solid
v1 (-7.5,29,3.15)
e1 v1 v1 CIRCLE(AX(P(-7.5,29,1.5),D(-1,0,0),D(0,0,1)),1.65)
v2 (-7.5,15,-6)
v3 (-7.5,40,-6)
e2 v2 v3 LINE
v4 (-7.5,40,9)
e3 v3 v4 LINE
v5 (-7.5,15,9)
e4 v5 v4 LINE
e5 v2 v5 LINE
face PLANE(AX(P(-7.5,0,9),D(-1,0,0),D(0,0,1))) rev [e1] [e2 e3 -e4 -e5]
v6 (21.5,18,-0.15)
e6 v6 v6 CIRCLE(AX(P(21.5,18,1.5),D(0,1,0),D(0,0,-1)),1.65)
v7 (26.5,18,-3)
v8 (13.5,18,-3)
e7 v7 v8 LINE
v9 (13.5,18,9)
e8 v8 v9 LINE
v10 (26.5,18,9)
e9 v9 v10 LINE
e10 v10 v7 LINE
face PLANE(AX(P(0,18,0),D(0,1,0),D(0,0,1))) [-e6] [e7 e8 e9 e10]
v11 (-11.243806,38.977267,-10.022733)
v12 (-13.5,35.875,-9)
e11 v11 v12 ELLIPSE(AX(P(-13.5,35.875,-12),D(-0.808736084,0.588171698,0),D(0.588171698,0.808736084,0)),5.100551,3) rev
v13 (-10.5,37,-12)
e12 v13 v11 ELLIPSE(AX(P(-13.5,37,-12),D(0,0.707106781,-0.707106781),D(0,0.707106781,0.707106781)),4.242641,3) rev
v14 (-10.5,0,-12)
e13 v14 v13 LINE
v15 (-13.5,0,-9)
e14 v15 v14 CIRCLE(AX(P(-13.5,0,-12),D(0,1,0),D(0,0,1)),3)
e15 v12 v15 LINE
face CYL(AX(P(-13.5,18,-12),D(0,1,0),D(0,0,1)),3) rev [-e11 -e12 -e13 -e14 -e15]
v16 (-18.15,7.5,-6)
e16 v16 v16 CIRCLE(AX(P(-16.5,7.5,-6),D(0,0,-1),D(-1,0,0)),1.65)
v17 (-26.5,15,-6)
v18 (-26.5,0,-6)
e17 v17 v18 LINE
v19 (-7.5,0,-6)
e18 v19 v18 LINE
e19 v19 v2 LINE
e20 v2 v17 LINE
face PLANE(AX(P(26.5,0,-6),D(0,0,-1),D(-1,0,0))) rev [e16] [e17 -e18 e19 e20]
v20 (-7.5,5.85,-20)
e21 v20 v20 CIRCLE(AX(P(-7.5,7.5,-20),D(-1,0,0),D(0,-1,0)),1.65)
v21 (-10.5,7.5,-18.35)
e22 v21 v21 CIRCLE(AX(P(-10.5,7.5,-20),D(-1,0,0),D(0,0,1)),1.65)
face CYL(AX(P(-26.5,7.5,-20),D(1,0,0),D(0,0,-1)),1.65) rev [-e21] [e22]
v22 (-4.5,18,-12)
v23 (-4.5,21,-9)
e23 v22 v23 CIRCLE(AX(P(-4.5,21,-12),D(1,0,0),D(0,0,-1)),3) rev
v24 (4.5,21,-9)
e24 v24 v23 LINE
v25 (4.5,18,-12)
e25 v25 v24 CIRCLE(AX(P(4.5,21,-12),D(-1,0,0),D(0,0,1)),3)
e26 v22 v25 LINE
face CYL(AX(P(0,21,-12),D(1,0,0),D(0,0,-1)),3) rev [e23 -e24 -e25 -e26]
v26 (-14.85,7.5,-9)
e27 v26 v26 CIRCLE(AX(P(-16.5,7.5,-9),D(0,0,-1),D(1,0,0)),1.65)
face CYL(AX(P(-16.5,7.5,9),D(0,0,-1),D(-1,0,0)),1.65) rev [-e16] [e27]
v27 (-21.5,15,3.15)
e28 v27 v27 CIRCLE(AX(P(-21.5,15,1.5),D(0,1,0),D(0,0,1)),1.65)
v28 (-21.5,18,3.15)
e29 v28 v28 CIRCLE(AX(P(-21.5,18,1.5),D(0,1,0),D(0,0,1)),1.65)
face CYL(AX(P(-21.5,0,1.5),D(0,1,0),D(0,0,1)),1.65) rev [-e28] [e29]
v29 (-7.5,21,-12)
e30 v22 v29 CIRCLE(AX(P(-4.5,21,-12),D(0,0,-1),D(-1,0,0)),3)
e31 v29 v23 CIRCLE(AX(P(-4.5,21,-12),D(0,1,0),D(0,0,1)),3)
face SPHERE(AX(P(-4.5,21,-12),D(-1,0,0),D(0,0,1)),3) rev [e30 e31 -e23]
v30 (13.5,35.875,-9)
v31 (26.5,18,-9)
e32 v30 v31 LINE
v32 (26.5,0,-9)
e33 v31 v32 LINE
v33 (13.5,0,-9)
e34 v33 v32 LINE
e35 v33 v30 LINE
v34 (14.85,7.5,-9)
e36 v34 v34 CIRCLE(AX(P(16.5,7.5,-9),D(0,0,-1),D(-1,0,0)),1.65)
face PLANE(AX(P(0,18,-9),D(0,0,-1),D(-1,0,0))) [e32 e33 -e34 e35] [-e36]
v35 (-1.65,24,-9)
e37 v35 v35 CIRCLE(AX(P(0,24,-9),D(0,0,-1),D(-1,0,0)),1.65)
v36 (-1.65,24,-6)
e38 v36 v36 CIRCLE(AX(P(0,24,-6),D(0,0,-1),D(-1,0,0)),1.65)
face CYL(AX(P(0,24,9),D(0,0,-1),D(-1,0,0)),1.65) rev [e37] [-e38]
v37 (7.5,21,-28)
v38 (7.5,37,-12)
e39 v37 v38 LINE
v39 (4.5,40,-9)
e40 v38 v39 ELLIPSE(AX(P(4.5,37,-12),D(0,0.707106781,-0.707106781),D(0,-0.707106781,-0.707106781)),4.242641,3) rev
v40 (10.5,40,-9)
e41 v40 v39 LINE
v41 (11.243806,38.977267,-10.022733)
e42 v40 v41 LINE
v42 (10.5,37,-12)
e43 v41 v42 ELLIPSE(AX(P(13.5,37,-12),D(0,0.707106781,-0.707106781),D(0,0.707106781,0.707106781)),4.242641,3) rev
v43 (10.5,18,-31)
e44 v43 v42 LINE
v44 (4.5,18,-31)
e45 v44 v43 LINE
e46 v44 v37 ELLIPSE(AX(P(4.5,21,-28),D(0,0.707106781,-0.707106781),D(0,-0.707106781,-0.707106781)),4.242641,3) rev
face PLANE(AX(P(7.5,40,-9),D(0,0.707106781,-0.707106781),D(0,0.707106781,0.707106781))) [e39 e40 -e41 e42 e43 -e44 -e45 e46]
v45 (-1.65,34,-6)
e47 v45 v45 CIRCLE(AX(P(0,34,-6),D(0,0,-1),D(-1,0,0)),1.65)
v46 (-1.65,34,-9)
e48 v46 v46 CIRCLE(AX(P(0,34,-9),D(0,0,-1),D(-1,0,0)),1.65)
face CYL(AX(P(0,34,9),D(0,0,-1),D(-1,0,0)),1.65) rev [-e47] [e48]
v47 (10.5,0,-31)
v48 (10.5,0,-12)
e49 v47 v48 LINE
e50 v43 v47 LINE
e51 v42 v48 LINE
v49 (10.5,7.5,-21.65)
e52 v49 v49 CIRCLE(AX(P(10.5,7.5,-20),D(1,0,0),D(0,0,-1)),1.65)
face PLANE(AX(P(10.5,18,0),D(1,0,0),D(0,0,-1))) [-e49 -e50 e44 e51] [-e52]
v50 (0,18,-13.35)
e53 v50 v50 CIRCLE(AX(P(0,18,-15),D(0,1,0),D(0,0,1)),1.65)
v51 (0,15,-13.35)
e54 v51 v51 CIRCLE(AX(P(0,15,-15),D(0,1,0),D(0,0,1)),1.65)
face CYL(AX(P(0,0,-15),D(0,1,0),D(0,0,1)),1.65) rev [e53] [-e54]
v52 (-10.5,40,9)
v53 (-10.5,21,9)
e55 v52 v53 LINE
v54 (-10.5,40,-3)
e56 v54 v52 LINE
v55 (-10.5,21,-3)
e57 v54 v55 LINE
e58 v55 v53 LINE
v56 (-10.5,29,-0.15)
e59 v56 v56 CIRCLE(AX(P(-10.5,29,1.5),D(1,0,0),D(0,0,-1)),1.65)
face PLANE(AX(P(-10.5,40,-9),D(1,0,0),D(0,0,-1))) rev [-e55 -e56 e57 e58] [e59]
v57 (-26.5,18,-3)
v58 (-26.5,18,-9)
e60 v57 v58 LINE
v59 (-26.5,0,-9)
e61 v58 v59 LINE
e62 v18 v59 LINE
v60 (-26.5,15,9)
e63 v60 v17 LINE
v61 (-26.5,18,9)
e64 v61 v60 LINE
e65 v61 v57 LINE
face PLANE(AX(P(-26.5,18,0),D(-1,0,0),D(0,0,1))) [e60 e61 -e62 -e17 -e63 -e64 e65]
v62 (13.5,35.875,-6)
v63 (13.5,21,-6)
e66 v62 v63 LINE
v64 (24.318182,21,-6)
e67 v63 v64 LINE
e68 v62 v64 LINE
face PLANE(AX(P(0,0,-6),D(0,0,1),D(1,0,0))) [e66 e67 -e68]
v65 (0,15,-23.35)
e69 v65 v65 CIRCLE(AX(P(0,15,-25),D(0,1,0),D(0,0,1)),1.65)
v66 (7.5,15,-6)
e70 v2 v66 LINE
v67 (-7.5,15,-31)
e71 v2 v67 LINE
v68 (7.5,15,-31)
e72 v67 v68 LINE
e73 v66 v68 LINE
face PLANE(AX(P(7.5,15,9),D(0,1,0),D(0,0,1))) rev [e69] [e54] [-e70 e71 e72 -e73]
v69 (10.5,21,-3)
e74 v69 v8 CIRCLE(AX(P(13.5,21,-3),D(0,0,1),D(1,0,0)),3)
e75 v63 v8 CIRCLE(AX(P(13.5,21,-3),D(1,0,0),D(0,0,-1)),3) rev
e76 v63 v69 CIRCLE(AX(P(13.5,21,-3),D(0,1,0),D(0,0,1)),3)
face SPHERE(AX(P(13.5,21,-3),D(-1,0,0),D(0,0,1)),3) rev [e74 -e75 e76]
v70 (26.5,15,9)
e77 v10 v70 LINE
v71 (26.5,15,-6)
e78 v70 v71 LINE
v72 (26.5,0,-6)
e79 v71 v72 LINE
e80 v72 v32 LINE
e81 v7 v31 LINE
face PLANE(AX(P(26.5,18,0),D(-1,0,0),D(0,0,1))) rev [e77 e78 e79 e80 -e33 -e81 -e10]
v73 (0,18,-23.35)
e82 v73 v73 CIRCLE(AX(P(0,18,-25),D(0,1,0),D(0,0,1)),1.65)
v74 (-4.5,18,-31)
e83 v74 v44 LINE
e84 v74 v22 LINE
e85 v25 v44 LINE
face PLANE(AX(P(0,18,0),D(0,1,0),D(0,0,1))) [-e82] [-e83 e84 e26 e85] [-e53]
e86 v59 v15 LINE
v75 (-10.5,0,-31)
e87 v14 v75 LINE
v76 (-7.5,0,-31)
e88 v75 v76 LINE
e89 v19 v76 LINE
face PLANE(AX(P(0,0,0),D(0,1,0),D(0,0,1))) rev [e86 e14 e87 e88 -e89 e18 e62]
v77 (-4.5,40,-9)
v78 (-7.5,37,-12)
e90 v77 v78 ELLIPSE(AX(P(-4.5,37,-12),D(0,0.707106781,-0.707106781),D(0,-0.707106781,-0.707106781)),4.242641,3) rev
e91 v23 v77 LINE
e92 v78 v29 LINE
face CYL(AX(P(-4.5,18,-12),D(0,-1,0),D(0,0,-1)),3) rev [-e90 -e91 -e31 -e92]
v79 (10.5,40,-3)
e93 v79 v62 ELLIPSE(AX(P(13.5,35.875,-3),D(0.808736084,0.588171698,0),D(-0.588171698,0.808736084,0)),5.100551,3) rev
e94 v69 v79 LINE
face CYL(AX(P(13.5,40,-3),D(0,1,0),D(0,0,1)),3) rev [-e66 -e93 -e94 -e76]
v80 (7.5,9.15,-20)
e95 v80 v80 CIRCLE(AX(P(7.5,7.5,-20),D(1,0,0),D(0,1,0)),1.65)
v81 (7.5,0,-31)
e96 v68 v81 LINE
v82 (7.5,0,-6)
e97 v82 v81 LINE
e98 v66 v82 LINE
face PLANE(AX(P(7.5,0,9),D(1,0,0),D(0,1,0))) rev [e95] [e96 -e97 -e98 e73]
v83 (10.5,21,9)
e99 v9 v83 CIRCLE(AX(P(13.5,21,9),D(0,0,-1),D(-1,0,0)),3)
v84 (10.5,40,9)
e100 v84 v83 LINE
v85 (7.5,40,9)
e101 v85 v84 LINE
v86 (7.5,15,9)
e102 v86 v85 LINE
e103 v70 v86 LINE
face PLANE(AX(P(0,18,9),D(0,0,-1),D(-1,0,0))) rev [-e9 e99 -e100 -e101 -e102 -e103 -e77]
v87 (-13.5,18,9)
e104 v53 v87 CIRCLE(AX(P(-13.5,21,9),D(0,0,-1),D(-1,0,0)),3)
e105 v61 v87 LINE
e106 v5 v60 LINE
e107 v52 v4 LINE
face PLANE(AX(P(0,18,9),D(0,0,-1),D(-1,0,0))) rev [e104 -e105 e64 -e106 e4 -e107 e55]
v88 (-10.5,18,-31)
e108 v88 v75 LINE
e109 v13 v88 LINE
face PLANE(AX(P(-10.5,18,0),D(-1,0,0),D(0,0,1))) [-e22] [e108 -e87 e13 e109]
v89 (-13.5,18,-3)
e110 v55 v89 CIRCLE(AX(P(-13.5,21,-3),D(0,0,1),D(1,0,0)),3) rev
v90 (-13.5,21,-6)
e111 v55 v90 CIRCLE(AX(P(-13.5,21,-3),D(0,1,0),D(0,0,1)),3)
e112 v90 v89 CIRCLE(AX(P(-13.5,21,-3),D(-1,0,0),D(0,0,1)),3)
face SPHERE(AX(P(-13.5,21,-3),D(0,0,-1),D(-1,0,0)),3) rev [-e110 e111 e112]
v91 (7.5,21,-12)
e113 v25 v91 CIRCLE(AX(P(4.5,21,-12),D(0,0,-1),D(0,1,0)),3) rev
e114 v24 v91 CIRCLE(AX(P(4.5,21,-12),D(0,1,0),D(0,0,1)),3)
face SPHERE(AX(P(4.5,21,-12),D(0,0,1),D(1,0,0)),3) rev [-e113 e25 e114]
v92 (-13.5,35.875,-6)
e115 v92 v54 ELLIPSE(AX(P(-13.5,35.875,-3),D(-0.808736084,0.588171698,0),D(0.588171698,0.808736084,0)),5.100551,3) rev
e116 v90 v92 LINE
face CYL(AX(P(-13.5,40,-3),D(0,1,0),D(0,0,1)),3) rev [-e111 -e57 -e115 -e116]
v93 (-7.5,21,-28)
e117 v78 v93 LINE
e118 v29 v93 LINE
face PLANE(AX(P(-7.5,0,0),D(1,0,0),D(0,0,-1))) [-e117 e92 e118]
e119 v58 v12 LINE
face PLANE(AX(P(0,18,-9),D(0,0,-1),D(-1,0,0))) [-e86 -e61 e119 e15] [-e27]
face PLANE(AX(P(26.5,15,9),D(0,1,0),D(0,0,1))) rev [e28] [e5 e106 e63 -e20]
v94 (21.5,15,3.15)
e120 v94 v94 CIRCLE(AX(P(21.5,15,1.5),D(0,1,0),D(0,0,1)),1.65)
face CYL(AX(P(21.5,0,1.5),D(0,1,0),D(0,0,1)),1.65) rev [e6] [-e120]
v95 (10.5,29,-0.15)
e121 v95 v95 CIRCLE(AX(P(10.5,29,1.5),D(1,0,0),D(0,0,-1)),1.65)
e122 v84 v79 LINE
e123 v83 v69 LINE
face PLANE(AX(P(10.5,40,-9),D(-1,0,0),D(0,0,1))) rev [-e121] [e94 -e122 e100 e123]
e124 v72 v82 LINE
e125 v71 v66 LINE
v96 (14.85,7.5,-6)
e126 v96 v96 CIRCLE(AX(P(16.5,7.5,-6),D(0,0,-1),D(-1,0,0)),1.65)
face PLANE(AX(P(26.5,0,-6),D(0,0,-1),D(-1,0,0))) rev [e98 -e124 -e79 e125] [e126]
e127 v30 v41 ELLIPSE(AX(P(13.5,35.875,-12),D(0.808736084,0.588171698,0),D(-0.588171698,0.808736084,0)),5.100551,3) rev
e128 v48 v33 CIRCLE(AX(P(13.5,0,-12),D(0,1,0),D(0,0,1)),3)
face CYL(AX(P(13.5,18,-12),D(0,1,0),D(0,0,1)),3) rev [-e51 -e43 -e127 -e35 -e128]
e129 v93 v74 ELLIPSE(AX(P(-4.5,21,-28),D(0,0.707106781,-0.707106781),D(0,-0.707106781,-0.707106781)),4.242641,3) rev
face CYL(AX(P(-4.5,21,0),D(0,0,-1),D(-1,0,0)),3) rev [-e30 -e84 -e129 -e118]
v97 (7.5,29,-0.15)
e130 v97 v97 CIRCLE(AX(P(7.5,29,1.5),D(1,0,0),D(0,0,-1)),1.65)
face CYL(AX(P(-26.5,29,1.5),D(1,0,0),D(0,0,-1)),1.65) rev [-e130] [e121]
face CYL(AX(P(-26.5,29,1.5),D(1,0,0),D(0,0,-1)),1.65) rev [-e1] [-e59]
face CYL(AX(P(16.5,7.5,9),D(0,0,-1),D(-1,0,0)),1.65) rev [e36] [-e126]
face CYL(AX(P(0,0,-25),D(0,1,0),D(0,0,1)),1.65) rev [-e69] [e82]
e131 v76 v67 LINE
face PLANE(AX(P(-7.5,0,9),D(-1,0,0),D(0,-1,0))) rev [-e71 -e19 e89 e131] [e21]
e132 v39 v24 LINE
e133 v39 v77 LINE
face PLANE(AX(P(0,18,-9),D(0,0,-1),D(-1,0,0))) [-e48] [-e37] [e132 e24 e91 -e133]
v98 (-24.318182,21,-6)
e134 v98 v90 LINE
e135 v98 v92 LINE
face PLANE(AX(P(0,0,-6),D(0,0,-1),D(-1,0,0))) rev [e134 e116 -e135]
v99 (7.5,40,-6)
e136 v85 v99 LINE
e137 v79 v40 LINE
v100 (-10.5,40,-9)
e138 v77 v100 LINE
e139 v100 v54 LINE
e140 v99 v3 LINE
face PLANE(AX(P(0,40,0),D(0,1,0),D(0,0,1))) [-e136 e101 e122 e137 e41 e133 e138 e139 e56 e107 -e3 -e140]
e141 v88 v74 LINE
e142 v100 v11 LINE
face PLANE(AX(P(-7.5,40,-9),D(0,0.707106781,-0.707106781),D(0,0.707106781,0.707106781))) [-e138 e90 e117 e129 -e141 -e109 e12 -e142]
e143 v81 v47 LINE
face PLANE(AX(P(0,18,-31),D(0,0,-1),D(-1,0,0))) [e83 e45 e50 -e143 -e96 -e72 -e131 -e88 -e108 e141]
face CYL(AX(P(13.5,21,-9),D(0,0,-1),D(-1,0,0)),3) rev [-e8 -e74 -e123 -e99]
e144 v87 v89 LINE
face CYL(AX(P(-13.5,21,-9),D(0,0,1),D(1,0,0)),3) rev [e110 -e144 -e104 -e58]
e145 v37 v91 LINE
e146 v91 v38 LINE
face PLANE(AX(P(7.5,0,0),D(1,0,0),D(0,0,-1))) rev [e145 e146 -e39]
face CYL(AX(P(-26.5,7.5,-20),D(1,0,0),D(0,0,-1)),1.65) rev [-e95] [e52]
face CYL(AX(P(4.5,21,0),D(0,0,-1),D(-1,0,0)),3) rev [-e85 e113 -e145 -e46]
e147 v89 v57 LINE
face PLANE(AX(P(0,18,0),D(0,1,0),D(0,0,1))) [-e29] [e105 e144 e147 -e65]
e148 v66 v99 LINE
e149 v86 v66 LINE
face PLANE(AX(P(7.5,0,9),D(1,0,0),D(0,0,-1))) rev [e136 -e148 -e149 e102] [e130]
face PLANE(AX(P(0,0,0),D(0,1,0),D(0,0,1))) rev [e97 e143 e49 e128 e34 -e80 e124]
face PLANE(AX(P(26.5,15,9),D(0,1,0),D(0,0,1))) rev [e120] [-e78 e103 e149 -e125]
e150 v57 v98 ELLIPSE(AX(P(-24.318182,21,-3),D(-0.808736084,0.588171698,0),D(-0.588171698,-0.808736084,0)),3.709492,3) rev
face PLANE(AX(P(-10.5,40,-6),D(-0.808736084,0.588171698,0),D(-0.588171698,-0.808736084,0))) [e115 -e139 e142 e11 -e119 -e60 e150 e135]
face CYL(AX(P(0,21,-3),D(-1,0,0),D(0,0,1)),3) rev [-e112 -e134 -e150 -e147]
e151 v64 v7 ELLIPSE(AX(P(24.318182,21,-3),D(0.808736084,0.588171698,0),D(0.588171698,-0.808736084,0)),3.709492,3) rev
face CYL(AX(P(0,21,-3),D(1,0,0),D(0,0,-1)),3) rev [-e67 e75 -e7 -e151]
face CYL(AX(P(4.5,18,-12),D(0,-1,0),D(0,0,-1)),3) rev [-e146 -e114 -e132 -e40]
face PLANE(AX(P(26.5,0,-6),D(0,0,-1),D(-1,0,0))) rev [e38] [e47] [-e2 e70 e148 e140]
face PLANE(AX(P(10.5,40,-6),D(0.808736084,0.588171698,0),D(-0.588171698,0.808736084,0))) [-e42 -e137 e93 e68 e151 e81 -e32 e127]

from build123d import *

# Parameters (mm, degrees)
EXTRUDE_1_DEPTH     = 18
SKETCH_2_W          = 21
SKETCH_2_H          = 18
EXTRUDE_2_DEPTH     = 22
SKETCH_3_W          = 15
SKETCH_3_H          = 15
CUT_EXTRUDE_1_DEPTH = 74.280283842
SKETCH_4_W          = 15
SKETCH_4_H          = 15
CUT_EXTRUDE_2_DEPTH = 58.124863238
SKETCH_5_W          = 15
SKETCH_5_H          = 15
CUT_EXTRUDE_3_DEPTH = 63.467991804
SKETCH_6_R          = 1.65
CUT_EXTRUDE_4_DEPTH = 53.784941034
SKETCH_7_R          = 1.65
CUT_EXTRUDE_5_DEPTH = 47.338428976
SKETCH_8_R          = 1.65
CUT_EXTRUDE_6_DEPTH = 63.689712075
EXTRUDE_4_DEPTH     = 3
EXTRUDE_5_DEPTH     = 3
EXTRUDE_6_DEPTH     = 3
FILLET_1_R          = 3


with BuildPart() as part:
    # 草图1 → 凸台-拉伸1 (new body)
    with BuildSketch(Plane(origin=(0, 0, 0), x_dir=(1, 0, 0), z_dir=(0, 1, 0))):
        Polygon((10.5, 9), (26.5, 9), (26.5, -9), (-26.5, -9), (-26.5, 9), (-10.5, 9), (-10.5, 31), (10.5, 31), align=None)
    extrude(amount=EXTRUDE_1_DEPTH)

    # 草图2 → 凸台-拉伸2 (add)
    with BuildSketch(Plane(origin=(0, 18, 0), x_dir=(1, 0, 0), z_dir=(0, 1, 0))):
        Rectangle(SKETCH_2_W, SKETCH_2_H)
    extrude(amount=EXTRUDE_2_DEPTH)

    # 草图3 → 切除-拉伸1 (cut, through all)
    with BuildSketch(Plane.ZY.offset(26.5)):
        with Locations((1.5, 7.5)):
            Rectangle(SKETCH_3_W, SKETCH_3_H)
    extrude(amount=-CUT_EXTRUDE_1_DEPTH, mode=Mode.SUBTRACT)

    # 草图4 → 切除-拉伸2 (cut, through all)
    with BuildSketch(Plane(origin=(0, 40, 0), x_dir=(1, 0, 0), z_dir=(0, 1, 0))):
        with Locations((0, -1.5)):
            Rectangle(SKETCH_4_W, SKETCH_4_H)
    extrude(amount=-CUT_EXTRUDE_2_DEPTH, mode=Mode.SUBTRACT)

    # 草图5 → 切除-拉伸3 (cut, through all)
    with BuildSketch(Plane(origin=(0, 0, -31), x_dir=(-1, 0, 0), z_dir=(0, 0, -1))):
        with Locations((0, 7.5)):
            Rectangle(SKETCH_5_W, SKETCH_5_H)
    extrude(amount=-CUT_EXTRUDE_3_DEPTH, mode=Mode.SUBTRACT)

    # 草图6 → 切除-拉伸4 (cut, through all)
    with BuildSketch(Plane(origin=(0, 0, -9), x_dir=(-1, 0, 0), z_dir=(0, 0, -1))):
        with Locations((-16.5, 7.5)):
            Circle(SKETCH_6_R)
        with Locations((0, 24)):
            Circle(SKETCH_6_R)
        with Locations((16.5, 7.5)):
            Circle(SKETCH_6_R)
        with Locations((0, 34)):
            Circle(SKETCH_6_R)
    extrude(amount=-CUT_EXTRUDE_4_DEPTH, mode=Mode.SUBTRACT)

    # 草图7 → 切除-拉伸5 (cut, through all)
    with BuildSketch(Plane(origin=(0, 18, 0), x_dir=(1, 0, 0), z_dir=(0, 1, 0))):
        with Locations(Location((-21.5, -1.5, 0), (0, 0, 270))):
            Circle(SKETCH_7_R)
        with Locations(Location((0, 15, 0), (0, 0, 270))):
            Circle(SKETCH_7_R)
        with Locations(Location((0, 25, 0), (0, 0, 270))):
            Circle(SKETCH_7_R)
        with Locations(Location((21.5, -1.5, 0), (0, 0, 270))):
            Circle(SKETCH_7_R)
    extrude(amount=-CUT_EXTRUDE_5_DEPTH, mode=Mode.SUBTRACT)

    # 草图8 → 切除-拉伸6 (cut, through all)
    with BuildSketch(Plane(origin=(10.5, 0, 0), x_dir=(0, 0, -1), z_dir=(1, 0, 0))):
        with Locations((-1.5, 29)):
            Circle(SKETCH_8_R)
        with Locations((20, 7.5)):
            Circle(SKETCH_8_R)
    extrude(amount=-CUT_EXTRUDE_6_DEPTH, mode=Mode.SUBTRACT)

    # 草图9 → 凸台-拉伸4 (add)
    with BuildSketch(Plane(origin=(0, 0, -9), x_dir=(-1, 0, 0), z_dir=(0, 0, -1))):
        Polygon((-10.5, 40), (-26.5, 18), (-10.5, 18), align=None)
        Polygon((10.5, 40), (26.5, 18), (10.5, 18), align=None)
    extrude(amount=-EXTRUDE_4_DEPTH)

    # 草图10 → 凸台-拉伸5 (add)
    with BuildSketch(Plane(origin=(10.5, 0, 0), x_dir=(0, 0, -1), z_dir=(1, 0, 0))):
        Polygon((9, 40), (31, 18), (9, 18), align=None)
    extrude(amount=-EXTRUDE_5_DEPTH)

    # 草图11 → 凸台-拉伸6 (add)
    with BuildSketch(Plane.ZY.offset(10.5)):
        Polygon((-9, 40), (-31, 18), (-9, 18), align=None)
    extrude(amount=-EXTRUDE_6_DEPTH)

    # 圆角1
    # the kernel refuses this fillet: 3 mm, written as the material it adds along each edge
    with BuildSketch(Plane(origin=(-13.5, 21, -3), x_dir=(0, -1, 0), z_dir=(1, 0, 0))) as fillet_1_piece_1_section:
        Polygon((0, 0), (FILLET_1_R, 0), (FILLET_1_R, FILLET_1_R), (0, FILLET_1_R), align=None)
    fillet_1_piece_1 = extrude(amount=FILLET_1_R, mode=Mode.PRIVATE)
    fillet_1_piece_1 = fillet_1_piece_1 - Plane(origin=(-13.5, 21, -3), x_dir=(0, 0.7071067811865475, 0.7071067811865475), z_dir=(1, 0, 0)) * Sphere(FILLET_1_R, mode=Mode.PRIVATE)
    add(fillet_1_piece_1)
    with BuildSketch(Plane(origin=(13.5, 21, -3), x_dir=(0, -1, 0), z_dir=(0, 0, -1))) as fillet_1_piece_2_section:
        Polygon((0, 0), (FILLET_1_R, 0), (FILLET_1_R, FILLET_1_R), (0, FILLET_1_R), align=None)
    fillet_1_piece_2 = extrude(amount=FILLET_1_R, mode=Mode.PRIVATE)
    fillet_1_piece_2 = fillet_1_piece_2 - Plane(origin=(13.5, 21, -3), x_dir=(0.7071067811865475, 0.7071067811865475, 0), z_dir=(0, 0, -1)) * Sphere(FILLET_1_R, mode=Mode.PRIVATE)
    add(fillet_1_piece_2)
    with BuildSketch(Plane(origin=(-4.5, 21, -12), x_dir=(-1, 0, 0), z_dir=(0, 0, 1))) as fillet_1_piece_3_section:
        Polygon((0, 0), (FILLET_1_R, 0), (FILLET_1_R, FILLET_1_R), (0, FILLET_1_R), align=None)
    fillet_1_piece_3 = extrude(amount=FILLET_1_R, mode=Mode.PRIVATE)
    fillet_1_piece_3 = fillet_1_piece_3 - Plane(origin=(-4.5, 21, -12), x_dir=(0.7071067811865475, 0.7071067811865475, 0), z_dir=(0, 0, 1)) * Sphere(FILLET_1_R, mode=Mode.PRIVATE)
    add(fillet_1_piece_3)
    with BuildSketch(Plane(origin=(4.5, 21, -12), x_dir=(0, 0, 1), z_dir=(1, 0, 0))) as fillet_1_piece_4_section:
        Polygon((0, 0), (FILLET_1_R, 0), (FILLET_1_R, FILLET_1_R), (0, FILLET_1_R), align=None)
    fillet_1_piece_4 = extrude(amount=FILLET_1_R, mode=Mode.PRIVATE)
    fillet_1_piece_4 = fillet_1_piece_4 - Plane(origin=(4.5, 21, -12), x_dir=(0, 0.7071067811865475, -0.7071067811865475), z_dir=(1, 0, 0)) * Sphere(FILLET_1_R, mode=Mode.PRIVATE)
    add(fillet_1_piece_4)
    with BuildSketch(Plane(origin=(-10.5, 18, 9), x_dir=(-1, 0, 0), z_dir=(0, 0, -1))) as fillet_1_piece_5:
        with BuildLine():
            CenterArc((FILLET_1_R, FILLET_1_R), FILLET_1_R, 180, 90)
            Line((0, FILLET_1_R), (0, 0))
            Line((0, 0), (FILLET_1_R, 0))
        make_face()
    extrude(amount=12)
    with BuildSketch(Plane(origin=(10.5, 21, -6), x_dir=(0, 0, 1), z_dir=(0, 1, 0))) as fillet_1_piece_6_section:
        with BuildLine():
            CenterArc((FILLET_1_R, FILLET_1_R), FILLET_1_R, 180, 90)
            Line((0, FILLET_1_R), (0, 0))
            Line((0, 0), (FILLET_1_R, 0))
        make_face()
    fillet_1_piece_6 = extrude(amount=19, mode=Mode.PRIVATE)
    fillet_1_piece_6 = split(fillet_1_piece_6, bisect_by=Plane(origin=(15.455477793, 33.186218035, -5.302148296), z_dir=(-0.8087360843031884, -0.5881716976750465, 0)), keep=Keep.TOP, mode=Mode.PRIVATE)
    add(fillet_1_piece_6)
    with BuildSketch(Plane(origin=(26.5, 18, -6), x_dir=(0, 1, 0), z_dir=(-1, 0, 0))) as fillet_1_piece_7_section:
        with BuildLine():
            CenterArc((FILLET_1_R, -FILLET_1_R), FILLET_1_R, 90, 90)
            Line((0, -FILLET_1_R), (0, 0))
            Line((0, 0), (FILLET_1_R, 0))
        make_face()
    fillet_1_piece_7 = extrude(amount=13, mode=Mode.PRIVATE)
    fillet_1_piece_7 = split(fillet_1_piece_7, bisect_by=Plane(origin=(23.857097581, 21.633990826, -5.306552659), z_dir=(-0.8087360843031884, -0.5881716976750465, 0)), keep=Keep.TOP, mode=Mode.PRIVATE)
    add(fillet_1_piece_7)
    with BuildSketch(Plane(origin=(-10.5, 0, -9), x_dir=(0, 0, -1), z_dir=(0, 1, 0))) as fillet_1_piece_8_section:
        with BuildLine():
            CenterArc((FILLET_1_R, FILLET_1_R), FILLET_1_R, 180, 90)
            Line((0, FILLET_1_R), (0, 0))
            Line((0, 0), (FILLET_1_R, 0))
        make_face()
    fillet_1_piece_8 = extrude(amount=47.5, mode=Mode.PRIVATE)
    fillet_1_piece_8 = split(fillet_1_piece_8, bisect_by=Plane(origin=(-11.170543691, 29.3263589, -19.6736411), z_dir=(0, -0.7071067811865478, 0.7071067811865474)), keep=Keep.TOP, mode=Mode.PRIVATE)
    fillet_1_piece_8 = split(fillet_1_piece_8, bisect_by=Plane(origin=(-20.564055467, 26.161923732, -9.677561004), z_dir=(0.8087360843031883, -0.5881716976750465, 0)), keep=Keep.TOP, mode=Mode.PRIVATE)
    add(fillet_1_piece_8)
    with BuildSketch(Plane(origin=(10.5, 0, -9), x_dir=(1, 0, 0), z_dir=(0, 1, 0))) as fillet_1_piece_9_section:
        with BuildLine():
            CenterArc((FILLET_1_R, FILLET_1_R), FILLET_1_R, 180, 90)
            Line((0, FILLET_1_R), (0, 0))
            Line((0, 0), (FILLET_1_R, 0))
        make_face()
    fillet_1_piece_9 = extrude(amount=47.5, mode=Mode.PRIVATE)
    fillet_1_piece_9 = split(fillet_1_piece_9, bisect_by=Plane(origin=(20.564055468, 26.161923731, -9.677561004), z_dir=(-0.8087360843031884, -0.5881716976750465, 0)), keep=Keep.TOP, mode=Mode.PRIVATE)
    fillet_1_piece_9 = split(fillet_1_piece_9, bisect_by=Plane(origin=(11.170543691, 29.326358899, -19.673641101), z_dir=(0, -0.7071067811865478, 0.7071067811865474)), keep=Keep.TOP, mode=Mode.PRIVATE)
    add(fillet_1_piece_9)
    with BuildSketch(Plane(origin=(-10.5, 21, -6), x_dir=(-1, 0, 0), z_dir=(0, 1, 0))) as fillet_1_piece_10_section:
        with BuildLine():
            CenterArc((FILLET_1_R, FILLET_1_R), FILLET_1_R, 180, 90)
            Line((0, FILLET_1_R), (0, 0))
            Line((0, 0), (FILLET_1_R, 0))
        make_face()
    fillet_1_piece_10 = extrude(amount=19, mode=Mode.PRIVATE)
    fillet_1_piece_10 = split(fillet_1_piece_10, bisect_by=Plane(origin=(-15.455477793, 33.186218035, -5.302148296), z_dir=(0.8087360843031883, -0.5881716976750465, 0)), keep=Keep.TOP, mode=Mode.PRIVATE)
    add(fillet_1_piece_10)
    with BuildSketch(Plane(origin=(-26.5, 18, -6), x_dir=(0, 0, 1), z_dir=(1, 0, 0))) as fillet_1_piece_11_section:
        with BuildLine():
            CenterArc((FILLET_1_R, -FILLET_1_R), FILLET_1_R, 90, 90)
            Line((0, -FILLET_1_R), (0, 0))
            Line((0, 0), (FILLET_1_R, 0))
        make_face()
    fillet_1_piece_11 = extrude(amount=13, mode=Mode.PRIVATE)
    fillet_1_piece_11 = split(fillet_1_piece_11, bisect_by=Plane(origin=(-23.857097581, 21.633990826, -5.306552659), z_dir=(0.8087360843031883, -0.5881716976750465, 0)), keep=Keep.TOP, mode=Mode.PRIVATE)
    add(fillet_1_piece_11)
    with BuildSketch(Plane(origin=(-4.5, 18, -9), x_dir=(0, 0, -1), z_dir=(1, 0, 0))) as fillet_1_piece_12:
        with BuildLine():
            CenterArc((FILLET_1_R, FILLET_1_R), FILLET_1_R, 180, 90)
            Line((0, FILLET_1_R), (0, 0))
            Line((0, 0), (FILLET_1_R, 0))
        make_face()
    extrude(amount=9)
    with BuildSketch(Plane(origin=(7.5, 21, -9), x_dir=(0, 0, -1), z_dir=(0, 1, 0))) as fillet_1_piece_13_section:
        with BuildLine():
            CenterArc((FILLET_1_R, FILLET_1_R), FILLET_1_R, 180, 90)
            Line((0, FILLET_1_R), (0, 0))
            Line((0, 0), (FILLET_1_R, 0))
        make_face()
    fillet_1_piece_13 = extrude(amount=19, mode=Mode.PRIVATE)
    fillet_1_piece_13 = split(fillet_1_piece_13, bisect_by=Plane(origin=(6.80742854, 34.757043793, -14.242956207), z_dir=(0, -0.7071067811865478, 0.7071067811865474)), keep=Keep.TOP, mode=Mode.PRIVATE)
    add(fillet_1_piece_13)
    with BuildSketch(Plane(origin=(7.5, 18, -31), x_dir=(-1, 0, 0), z_dir=(0, 0, 1))) as fillet_1_piece_14_section:
        with BuildLine():
            CenterArc((FILLET_1_R, -FILLET_1_R), FILLET_1_R, 90, 90)
            Line((0, -FILLET_1_R), (0, 0))
            Line((0, 0), (FILLET_1_R, 0))
        make_face()
    fillet_1_piece_14 = extrude(amount=19, mode=Mode.PRIVATE)
    fillet_1_piece_14 = split(fillet_1_piece_14, bisect_by=Plane(origin=(6.80742854, 23.242956207, -25.757043793), z_dir=(0, -0.7071067811865478, 0.7071067811865474)), keep=Keep.TOP, mode=Mode.PRIVATE)
    add(fillet_1_piece_14)
    with BuildSketch(Plane(origin=(-7.5, 21, -9), x_dir=(1, 0, 0), z_dir=(0, 1, 0))) as fillet_1_piece_15_section:
        with BuildLine():
            CenterArc((FILLET_1_R, FILLET_1_R), FILLET_1_R, 180, 90)
            Line((0, FILLET_1_R), (0, 0))
            Line((0, 0), (FILLET_1_R, 0))
        make_face()
    fillet_1_piece_15 = extrude(amount=19, mode=Mode.PRIVATE)
    fillet_1_piece_15 = split(fillet_1_piece_15, bisect_by=Plane(origin=(-6.80742854, 34.757043793, -14.242956207), z_dir=(0, -0.7071067811865478, 0.7071067811865474)), keep=Keep.TOP, mode=Mode.PRIVATE)
    add(fillet_1_piece_15)
    with BuildSketch(Plane(origin=(-7.5, 18, -31), x_dir=(1, 0, 0), z_dir=(0, 0, 1))) as fillet_1_piece_16_section:
        with BuildLine():
            CenterArc((FILLET_1_R, FILLET_1_R), FILLET_1_R, 180, 90)
            Line((0, FILLET_1_R), (0, 0))
            Line((0, 0), (FILLET_1_R, 0))
        make_face()
    fillet_1_piece_16 = extrude(amount=19, mode=Mode.PRIVATE)
    fillet_1_piece_16 = split(fillet_1_piece_16, bisect_by=Plane(origin=(-6.80742854, 23.242956207, -25.757043793), z_dir=(0, -0.7071067811865478, 0.7071067811865474)), keep=Keep.TOP, mode=Mode.PRIVATE)
    add(fillet_1_piece_16)
    with BuildSketch(Plane(origin=(10.5, 18, -3), x_dir=(0, 1, 0), z_dir=(0, 0, 1))) as fillet_1_piece_17:
        with BuildLine():
            CenterArc((FILLET_1_R, -FILLET_1_R), FILLET_1_R, 90, 90)
            Line((0, -FILLET_1_R), (0, 0))
            Line((0, 0), (FILLET_1_R, 0))
        make_face()
    extrude(amount=12)


solid = part.part
